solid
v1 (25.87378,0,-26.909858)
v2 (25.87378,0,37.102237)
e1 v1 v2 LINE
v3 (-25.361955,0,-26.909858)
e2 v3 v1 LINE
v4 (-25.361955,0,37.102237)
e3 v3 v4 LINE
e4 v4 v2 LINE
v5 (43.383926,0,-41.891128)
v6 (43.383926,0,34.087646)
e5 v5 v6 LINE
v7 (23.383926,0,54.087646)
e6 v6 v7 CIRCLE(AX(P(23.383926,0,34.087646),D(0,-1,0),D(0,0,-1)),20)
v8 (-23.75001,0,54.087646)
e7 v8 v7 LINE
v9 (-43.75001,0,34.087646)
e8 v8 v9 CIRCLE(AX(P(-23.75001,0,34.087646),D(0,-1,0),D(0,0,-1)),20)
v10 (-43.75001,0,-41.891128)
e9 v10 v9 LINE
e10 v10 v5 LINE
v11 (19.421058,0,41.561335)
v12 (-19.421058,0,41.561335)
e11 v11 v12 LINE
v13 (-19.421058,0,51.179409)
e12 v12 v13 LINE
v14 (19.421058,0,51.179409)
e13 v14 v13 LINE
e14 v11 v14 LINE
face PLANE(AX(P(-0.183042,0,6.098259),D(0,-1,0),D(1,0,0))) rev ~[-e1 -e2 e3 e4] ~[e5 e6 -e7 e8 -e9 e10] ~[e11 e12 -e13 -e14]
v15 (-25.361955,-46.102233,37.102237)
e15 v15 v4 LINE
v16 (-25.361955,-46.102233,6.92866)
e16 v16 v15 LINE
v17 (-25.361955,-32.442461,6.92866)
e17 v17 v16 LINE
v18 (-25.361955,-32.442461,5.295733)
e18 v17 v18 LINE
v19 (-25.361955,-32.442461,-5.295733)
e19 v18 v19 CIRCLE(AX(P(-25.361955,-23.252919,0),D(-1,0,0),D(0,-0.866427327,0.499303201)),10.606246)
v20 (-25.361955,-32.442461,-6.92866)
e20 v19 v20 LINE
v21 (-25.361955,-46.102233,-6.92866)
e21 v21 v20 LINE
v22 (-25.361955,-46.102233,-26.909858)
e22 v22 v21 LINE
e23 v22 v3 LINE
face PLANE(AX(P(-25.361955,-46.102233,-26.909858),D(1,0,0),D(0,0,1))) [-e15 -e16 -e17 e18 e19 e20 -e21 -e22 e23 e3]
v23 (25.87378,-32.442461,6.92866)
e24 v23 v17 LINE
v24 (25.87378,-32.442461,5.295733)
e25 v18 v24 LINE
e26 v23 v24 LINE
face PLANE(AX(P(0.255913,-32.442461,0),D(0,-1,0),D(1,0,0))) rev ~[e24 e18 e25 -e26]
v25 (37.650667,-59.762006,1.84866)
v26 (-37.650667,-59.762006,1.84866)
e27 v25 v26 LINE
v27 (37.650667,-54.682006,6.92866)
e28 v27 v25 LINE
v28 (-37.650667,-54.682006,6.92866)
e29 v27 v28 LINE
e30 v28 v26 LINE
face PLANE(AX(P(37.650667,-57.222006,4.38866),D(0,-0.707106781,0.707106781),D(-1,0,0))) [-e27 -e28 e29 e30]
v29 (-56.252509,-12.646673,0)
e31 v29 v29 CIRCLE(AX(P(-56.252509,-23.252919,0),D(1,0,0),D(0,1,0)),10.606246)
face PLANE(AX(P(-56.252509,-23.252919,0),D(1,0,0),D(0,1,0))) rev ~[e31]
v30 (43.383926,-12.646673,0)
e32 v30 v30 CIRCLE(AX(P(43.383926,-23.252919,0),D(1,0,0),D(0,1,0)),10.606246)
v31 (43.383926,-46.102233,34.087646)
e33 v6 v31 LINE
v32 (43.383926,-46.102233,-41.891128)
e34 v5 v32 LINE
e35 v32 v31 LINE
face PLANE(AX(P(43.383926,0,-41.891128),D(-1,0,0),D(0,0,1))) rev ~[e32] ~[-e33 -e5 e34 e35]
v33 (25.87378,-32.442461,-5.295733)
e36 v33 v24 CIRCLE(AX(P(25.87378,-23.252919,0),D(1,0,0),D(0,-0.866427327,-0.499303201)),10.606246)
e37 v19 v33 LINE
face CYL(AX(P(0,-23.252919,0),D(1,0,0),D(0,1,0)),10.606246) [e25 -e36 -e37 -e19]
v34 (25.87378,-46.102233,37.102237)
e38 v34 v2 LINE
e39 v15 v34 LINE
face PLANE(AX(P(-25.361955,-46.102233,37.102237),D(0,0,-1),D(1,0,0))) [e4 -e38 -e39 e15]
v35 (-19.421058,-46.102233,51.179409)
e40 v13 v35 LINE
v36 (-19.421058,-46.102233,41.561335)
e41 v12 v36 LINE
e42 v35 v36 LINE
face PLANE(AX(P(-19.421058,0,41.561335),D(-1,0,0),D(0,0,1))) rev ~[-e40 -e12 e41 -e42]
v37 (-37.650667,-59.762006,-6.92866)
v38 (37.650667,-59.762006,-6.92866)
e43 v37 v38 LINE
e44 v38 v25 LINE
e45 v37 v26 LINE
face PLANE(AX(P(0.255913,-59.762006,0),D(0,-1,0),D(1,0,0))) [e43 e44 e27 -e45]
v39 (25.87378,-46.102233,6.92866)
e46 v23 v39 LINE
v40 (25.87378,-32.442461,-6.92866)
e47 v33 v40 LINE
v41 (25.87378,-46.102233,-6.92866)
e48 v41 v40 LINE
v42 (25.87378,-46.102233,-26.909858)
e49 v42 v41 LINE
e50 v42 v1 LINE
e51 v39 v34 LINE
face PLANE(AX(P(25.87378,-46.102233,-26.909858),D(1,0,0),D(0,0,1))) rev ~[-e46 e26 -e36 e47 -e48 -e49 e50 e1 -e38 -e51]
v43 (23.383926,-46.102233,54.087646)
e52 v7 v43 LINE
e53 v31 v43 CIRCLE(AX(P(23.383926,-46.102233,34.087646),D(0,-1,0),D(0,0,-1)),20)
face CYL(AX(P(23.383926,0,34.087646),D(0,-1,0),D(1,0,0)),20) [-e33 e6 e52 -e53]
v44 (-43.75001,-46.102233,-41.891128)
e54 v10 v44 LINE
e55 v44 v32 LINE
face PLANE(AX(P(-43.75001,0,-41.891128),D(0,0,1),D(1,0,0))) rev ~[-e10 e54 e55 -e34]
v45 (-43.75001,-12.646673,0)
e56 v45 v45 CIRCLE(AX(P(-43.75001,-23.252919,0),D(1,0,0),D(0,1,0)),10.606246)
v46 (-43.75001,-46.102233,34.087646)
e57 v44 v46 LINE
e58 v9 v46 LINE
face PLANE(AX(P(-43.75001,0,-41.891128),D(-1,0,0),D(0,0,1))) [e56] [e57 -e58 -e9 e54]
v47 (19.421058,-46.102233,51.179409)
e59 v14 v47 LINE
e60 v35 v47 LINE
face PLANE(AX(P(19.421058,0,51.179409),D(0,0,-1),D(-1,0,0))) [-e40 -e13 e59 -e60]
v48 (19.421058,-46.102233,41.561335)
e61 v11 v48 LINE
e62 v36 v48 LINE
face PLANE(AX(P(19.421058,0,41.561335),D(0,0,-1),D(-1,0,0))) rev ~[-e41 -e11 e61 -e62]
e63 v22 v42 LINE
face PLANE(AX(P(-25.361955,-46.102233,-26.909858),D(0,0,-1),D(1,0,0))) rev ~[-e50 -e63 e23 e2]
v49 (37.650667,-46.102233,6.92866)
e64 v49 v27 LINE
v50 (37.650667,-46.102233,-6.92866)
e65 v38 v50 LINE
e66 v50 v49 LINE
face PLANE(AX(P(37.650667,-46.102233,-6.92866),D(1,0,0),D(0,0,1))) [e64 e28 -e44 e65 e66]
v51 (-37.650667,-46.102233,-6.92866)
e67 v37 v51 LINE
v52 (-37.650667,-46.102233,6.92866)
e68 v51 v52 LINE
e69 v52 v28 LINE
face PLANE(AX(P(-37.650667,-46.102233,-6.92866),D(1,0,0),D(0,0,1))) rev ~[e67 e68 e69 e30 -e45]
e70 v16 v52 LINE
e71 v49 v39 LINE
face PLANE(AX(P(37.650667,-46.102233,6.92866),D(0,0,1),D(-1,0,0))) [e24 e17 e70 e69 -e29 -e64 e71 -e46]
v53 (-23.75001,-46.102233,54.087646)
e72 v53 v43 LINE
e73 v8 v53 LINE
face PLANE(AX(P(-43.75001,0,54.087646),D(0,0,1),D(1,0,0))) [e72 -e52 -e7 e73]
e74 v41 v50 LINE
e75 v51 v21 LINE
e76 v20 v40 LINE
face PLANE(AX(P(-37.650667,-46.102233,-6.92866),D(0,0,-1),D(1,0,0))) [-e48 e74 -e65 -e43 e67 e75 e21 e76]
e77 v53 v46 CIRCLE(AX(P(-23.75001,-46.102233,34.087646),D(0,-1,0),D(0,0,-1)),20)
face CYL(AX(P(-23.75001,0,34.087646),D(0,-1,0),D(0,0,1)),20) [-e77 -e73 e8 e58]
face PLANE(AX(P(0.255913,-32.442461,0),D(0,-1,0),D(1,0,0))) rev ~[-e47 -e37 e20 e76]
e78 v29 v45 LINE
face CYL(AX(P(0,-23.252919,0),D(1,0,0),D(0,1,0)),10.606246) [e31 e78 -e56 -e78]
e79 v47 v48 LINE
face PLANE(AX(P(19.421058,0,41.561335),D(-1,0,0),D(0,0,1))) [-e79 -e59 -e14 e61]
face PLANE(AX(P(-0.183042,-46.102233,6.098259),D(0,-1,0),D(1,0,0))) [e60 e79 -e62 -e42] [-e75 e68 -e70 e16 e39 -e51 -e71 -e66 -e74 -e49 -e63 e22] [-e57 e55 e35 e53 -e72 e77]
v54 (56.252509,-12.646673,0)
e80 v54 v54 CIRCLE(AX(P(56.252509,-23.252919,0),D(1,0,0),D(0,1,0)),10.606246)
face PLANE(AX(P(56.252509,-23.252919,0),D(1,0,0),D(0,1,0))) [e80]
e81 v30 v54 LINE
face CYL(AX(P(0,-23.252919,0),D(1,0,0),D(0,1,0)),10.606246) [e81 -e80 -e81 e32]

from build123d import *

# Parameters (mm, degrees)
F0_W      = 87.133936584
F0_H      = 95.9787741303
F1_DEPTH  = 46.1022332311
F2_W      = 51.2357354164
F2_H      = 64.0120953321
F3_DEPTH  = 79.969028011
F6_R      = 10.6062460881
F7_DEPTH  = 56.2525093555
F8_W      = 38.8421155512
F8_H      = 9.6180737019
F9_DEPTH  = 59.3906808645
F10_W     = 51.2357354164
F10_H     = 13.8573199511
F10_W_2   = 11.7768868804
F10_W_3   = 12.2887119651
F11_DEPTH = 13.6597724631
F12_R     = 20
F13_SIZE  = 5.08


# Not quite as in the source:
# - a feature names something its author has since deleted; it is built from what else it names
# - the program builds the solid bodies; features that only make, move or delete a surface that nothing else refers to are left out


with BuildPart() as f1:
    # F0 (on Front) → F1 (new body)
    with BuildSketch(Plane.XZ):
        with Locations((-0.1830421388, 6.0982592404)):
            Rectangle(F0_W, F0_H)
    extrude(amount=F1_DEPTH)

    # F2 (on face) → F3 (cut)
    with BuildSketch(Plane.XZ.offset(46.1022332311)):
        with Locations((0.2559125423, 5.0961896777)):
            Rectangle(F2_W, F2_H)
    extrude(amount=-F3_DEPTH, mode=Mode.SUBTRACT)

    # F6 (on Right) → F7 (join, symmetric)
    with BuildSketch(Plane.YZ):
        with Locations((-23.2529193163, 0)):
            Circle(F6_R)
    extrude(amount=F7_DEPTH, both=True)

    # F8 (on face) → F9 (cut)
    with BuildSketch(Plane(origin=(0, 0, 0), x_dir=(-1, 0, 0), z_dir=(0, 1, 0))):
        with Locations((0, 46.3703721762)):
            Rectangle(F8_W, F8_H)
    extrude(amount=-F9_DEPTH, mode=Mode.SUBTRACT)

    # F10 (on face) → F11 (join, symmetric)
    with BuildSketch(Plane.XZ.offset(46.1022332311)):
        with Locations((0.2559125423, 0)):
            Rectangle(F10_W, F10_H)
        with Locations((31.7622236907, 0)):
            Rectangle(F10_W_2, F10_H)
        with Locations((-31.5063111484, 0)):
            Rectangle(F10_W_3, F10_H)
    extrude(amount=F11_DEPTH, both=True)

    # F12
    f12_edges = [f1.edges().sort_by_distance(p)[0] for p in [
        (-43.75001, -23.051117, 54.087646),
        (43.383926, -23.051117, 54.087646),
    ]]
    fillet(f12_edges, radius=F12_R)

    # F13
    f13_edges = [f1.edges().sort_by_distance(p)[0] for p in [
        (0, -59.762006, 6.92866),
    ]]
    chamfer(f13_edges, length=F13_SIZE)


solid = f1.part
